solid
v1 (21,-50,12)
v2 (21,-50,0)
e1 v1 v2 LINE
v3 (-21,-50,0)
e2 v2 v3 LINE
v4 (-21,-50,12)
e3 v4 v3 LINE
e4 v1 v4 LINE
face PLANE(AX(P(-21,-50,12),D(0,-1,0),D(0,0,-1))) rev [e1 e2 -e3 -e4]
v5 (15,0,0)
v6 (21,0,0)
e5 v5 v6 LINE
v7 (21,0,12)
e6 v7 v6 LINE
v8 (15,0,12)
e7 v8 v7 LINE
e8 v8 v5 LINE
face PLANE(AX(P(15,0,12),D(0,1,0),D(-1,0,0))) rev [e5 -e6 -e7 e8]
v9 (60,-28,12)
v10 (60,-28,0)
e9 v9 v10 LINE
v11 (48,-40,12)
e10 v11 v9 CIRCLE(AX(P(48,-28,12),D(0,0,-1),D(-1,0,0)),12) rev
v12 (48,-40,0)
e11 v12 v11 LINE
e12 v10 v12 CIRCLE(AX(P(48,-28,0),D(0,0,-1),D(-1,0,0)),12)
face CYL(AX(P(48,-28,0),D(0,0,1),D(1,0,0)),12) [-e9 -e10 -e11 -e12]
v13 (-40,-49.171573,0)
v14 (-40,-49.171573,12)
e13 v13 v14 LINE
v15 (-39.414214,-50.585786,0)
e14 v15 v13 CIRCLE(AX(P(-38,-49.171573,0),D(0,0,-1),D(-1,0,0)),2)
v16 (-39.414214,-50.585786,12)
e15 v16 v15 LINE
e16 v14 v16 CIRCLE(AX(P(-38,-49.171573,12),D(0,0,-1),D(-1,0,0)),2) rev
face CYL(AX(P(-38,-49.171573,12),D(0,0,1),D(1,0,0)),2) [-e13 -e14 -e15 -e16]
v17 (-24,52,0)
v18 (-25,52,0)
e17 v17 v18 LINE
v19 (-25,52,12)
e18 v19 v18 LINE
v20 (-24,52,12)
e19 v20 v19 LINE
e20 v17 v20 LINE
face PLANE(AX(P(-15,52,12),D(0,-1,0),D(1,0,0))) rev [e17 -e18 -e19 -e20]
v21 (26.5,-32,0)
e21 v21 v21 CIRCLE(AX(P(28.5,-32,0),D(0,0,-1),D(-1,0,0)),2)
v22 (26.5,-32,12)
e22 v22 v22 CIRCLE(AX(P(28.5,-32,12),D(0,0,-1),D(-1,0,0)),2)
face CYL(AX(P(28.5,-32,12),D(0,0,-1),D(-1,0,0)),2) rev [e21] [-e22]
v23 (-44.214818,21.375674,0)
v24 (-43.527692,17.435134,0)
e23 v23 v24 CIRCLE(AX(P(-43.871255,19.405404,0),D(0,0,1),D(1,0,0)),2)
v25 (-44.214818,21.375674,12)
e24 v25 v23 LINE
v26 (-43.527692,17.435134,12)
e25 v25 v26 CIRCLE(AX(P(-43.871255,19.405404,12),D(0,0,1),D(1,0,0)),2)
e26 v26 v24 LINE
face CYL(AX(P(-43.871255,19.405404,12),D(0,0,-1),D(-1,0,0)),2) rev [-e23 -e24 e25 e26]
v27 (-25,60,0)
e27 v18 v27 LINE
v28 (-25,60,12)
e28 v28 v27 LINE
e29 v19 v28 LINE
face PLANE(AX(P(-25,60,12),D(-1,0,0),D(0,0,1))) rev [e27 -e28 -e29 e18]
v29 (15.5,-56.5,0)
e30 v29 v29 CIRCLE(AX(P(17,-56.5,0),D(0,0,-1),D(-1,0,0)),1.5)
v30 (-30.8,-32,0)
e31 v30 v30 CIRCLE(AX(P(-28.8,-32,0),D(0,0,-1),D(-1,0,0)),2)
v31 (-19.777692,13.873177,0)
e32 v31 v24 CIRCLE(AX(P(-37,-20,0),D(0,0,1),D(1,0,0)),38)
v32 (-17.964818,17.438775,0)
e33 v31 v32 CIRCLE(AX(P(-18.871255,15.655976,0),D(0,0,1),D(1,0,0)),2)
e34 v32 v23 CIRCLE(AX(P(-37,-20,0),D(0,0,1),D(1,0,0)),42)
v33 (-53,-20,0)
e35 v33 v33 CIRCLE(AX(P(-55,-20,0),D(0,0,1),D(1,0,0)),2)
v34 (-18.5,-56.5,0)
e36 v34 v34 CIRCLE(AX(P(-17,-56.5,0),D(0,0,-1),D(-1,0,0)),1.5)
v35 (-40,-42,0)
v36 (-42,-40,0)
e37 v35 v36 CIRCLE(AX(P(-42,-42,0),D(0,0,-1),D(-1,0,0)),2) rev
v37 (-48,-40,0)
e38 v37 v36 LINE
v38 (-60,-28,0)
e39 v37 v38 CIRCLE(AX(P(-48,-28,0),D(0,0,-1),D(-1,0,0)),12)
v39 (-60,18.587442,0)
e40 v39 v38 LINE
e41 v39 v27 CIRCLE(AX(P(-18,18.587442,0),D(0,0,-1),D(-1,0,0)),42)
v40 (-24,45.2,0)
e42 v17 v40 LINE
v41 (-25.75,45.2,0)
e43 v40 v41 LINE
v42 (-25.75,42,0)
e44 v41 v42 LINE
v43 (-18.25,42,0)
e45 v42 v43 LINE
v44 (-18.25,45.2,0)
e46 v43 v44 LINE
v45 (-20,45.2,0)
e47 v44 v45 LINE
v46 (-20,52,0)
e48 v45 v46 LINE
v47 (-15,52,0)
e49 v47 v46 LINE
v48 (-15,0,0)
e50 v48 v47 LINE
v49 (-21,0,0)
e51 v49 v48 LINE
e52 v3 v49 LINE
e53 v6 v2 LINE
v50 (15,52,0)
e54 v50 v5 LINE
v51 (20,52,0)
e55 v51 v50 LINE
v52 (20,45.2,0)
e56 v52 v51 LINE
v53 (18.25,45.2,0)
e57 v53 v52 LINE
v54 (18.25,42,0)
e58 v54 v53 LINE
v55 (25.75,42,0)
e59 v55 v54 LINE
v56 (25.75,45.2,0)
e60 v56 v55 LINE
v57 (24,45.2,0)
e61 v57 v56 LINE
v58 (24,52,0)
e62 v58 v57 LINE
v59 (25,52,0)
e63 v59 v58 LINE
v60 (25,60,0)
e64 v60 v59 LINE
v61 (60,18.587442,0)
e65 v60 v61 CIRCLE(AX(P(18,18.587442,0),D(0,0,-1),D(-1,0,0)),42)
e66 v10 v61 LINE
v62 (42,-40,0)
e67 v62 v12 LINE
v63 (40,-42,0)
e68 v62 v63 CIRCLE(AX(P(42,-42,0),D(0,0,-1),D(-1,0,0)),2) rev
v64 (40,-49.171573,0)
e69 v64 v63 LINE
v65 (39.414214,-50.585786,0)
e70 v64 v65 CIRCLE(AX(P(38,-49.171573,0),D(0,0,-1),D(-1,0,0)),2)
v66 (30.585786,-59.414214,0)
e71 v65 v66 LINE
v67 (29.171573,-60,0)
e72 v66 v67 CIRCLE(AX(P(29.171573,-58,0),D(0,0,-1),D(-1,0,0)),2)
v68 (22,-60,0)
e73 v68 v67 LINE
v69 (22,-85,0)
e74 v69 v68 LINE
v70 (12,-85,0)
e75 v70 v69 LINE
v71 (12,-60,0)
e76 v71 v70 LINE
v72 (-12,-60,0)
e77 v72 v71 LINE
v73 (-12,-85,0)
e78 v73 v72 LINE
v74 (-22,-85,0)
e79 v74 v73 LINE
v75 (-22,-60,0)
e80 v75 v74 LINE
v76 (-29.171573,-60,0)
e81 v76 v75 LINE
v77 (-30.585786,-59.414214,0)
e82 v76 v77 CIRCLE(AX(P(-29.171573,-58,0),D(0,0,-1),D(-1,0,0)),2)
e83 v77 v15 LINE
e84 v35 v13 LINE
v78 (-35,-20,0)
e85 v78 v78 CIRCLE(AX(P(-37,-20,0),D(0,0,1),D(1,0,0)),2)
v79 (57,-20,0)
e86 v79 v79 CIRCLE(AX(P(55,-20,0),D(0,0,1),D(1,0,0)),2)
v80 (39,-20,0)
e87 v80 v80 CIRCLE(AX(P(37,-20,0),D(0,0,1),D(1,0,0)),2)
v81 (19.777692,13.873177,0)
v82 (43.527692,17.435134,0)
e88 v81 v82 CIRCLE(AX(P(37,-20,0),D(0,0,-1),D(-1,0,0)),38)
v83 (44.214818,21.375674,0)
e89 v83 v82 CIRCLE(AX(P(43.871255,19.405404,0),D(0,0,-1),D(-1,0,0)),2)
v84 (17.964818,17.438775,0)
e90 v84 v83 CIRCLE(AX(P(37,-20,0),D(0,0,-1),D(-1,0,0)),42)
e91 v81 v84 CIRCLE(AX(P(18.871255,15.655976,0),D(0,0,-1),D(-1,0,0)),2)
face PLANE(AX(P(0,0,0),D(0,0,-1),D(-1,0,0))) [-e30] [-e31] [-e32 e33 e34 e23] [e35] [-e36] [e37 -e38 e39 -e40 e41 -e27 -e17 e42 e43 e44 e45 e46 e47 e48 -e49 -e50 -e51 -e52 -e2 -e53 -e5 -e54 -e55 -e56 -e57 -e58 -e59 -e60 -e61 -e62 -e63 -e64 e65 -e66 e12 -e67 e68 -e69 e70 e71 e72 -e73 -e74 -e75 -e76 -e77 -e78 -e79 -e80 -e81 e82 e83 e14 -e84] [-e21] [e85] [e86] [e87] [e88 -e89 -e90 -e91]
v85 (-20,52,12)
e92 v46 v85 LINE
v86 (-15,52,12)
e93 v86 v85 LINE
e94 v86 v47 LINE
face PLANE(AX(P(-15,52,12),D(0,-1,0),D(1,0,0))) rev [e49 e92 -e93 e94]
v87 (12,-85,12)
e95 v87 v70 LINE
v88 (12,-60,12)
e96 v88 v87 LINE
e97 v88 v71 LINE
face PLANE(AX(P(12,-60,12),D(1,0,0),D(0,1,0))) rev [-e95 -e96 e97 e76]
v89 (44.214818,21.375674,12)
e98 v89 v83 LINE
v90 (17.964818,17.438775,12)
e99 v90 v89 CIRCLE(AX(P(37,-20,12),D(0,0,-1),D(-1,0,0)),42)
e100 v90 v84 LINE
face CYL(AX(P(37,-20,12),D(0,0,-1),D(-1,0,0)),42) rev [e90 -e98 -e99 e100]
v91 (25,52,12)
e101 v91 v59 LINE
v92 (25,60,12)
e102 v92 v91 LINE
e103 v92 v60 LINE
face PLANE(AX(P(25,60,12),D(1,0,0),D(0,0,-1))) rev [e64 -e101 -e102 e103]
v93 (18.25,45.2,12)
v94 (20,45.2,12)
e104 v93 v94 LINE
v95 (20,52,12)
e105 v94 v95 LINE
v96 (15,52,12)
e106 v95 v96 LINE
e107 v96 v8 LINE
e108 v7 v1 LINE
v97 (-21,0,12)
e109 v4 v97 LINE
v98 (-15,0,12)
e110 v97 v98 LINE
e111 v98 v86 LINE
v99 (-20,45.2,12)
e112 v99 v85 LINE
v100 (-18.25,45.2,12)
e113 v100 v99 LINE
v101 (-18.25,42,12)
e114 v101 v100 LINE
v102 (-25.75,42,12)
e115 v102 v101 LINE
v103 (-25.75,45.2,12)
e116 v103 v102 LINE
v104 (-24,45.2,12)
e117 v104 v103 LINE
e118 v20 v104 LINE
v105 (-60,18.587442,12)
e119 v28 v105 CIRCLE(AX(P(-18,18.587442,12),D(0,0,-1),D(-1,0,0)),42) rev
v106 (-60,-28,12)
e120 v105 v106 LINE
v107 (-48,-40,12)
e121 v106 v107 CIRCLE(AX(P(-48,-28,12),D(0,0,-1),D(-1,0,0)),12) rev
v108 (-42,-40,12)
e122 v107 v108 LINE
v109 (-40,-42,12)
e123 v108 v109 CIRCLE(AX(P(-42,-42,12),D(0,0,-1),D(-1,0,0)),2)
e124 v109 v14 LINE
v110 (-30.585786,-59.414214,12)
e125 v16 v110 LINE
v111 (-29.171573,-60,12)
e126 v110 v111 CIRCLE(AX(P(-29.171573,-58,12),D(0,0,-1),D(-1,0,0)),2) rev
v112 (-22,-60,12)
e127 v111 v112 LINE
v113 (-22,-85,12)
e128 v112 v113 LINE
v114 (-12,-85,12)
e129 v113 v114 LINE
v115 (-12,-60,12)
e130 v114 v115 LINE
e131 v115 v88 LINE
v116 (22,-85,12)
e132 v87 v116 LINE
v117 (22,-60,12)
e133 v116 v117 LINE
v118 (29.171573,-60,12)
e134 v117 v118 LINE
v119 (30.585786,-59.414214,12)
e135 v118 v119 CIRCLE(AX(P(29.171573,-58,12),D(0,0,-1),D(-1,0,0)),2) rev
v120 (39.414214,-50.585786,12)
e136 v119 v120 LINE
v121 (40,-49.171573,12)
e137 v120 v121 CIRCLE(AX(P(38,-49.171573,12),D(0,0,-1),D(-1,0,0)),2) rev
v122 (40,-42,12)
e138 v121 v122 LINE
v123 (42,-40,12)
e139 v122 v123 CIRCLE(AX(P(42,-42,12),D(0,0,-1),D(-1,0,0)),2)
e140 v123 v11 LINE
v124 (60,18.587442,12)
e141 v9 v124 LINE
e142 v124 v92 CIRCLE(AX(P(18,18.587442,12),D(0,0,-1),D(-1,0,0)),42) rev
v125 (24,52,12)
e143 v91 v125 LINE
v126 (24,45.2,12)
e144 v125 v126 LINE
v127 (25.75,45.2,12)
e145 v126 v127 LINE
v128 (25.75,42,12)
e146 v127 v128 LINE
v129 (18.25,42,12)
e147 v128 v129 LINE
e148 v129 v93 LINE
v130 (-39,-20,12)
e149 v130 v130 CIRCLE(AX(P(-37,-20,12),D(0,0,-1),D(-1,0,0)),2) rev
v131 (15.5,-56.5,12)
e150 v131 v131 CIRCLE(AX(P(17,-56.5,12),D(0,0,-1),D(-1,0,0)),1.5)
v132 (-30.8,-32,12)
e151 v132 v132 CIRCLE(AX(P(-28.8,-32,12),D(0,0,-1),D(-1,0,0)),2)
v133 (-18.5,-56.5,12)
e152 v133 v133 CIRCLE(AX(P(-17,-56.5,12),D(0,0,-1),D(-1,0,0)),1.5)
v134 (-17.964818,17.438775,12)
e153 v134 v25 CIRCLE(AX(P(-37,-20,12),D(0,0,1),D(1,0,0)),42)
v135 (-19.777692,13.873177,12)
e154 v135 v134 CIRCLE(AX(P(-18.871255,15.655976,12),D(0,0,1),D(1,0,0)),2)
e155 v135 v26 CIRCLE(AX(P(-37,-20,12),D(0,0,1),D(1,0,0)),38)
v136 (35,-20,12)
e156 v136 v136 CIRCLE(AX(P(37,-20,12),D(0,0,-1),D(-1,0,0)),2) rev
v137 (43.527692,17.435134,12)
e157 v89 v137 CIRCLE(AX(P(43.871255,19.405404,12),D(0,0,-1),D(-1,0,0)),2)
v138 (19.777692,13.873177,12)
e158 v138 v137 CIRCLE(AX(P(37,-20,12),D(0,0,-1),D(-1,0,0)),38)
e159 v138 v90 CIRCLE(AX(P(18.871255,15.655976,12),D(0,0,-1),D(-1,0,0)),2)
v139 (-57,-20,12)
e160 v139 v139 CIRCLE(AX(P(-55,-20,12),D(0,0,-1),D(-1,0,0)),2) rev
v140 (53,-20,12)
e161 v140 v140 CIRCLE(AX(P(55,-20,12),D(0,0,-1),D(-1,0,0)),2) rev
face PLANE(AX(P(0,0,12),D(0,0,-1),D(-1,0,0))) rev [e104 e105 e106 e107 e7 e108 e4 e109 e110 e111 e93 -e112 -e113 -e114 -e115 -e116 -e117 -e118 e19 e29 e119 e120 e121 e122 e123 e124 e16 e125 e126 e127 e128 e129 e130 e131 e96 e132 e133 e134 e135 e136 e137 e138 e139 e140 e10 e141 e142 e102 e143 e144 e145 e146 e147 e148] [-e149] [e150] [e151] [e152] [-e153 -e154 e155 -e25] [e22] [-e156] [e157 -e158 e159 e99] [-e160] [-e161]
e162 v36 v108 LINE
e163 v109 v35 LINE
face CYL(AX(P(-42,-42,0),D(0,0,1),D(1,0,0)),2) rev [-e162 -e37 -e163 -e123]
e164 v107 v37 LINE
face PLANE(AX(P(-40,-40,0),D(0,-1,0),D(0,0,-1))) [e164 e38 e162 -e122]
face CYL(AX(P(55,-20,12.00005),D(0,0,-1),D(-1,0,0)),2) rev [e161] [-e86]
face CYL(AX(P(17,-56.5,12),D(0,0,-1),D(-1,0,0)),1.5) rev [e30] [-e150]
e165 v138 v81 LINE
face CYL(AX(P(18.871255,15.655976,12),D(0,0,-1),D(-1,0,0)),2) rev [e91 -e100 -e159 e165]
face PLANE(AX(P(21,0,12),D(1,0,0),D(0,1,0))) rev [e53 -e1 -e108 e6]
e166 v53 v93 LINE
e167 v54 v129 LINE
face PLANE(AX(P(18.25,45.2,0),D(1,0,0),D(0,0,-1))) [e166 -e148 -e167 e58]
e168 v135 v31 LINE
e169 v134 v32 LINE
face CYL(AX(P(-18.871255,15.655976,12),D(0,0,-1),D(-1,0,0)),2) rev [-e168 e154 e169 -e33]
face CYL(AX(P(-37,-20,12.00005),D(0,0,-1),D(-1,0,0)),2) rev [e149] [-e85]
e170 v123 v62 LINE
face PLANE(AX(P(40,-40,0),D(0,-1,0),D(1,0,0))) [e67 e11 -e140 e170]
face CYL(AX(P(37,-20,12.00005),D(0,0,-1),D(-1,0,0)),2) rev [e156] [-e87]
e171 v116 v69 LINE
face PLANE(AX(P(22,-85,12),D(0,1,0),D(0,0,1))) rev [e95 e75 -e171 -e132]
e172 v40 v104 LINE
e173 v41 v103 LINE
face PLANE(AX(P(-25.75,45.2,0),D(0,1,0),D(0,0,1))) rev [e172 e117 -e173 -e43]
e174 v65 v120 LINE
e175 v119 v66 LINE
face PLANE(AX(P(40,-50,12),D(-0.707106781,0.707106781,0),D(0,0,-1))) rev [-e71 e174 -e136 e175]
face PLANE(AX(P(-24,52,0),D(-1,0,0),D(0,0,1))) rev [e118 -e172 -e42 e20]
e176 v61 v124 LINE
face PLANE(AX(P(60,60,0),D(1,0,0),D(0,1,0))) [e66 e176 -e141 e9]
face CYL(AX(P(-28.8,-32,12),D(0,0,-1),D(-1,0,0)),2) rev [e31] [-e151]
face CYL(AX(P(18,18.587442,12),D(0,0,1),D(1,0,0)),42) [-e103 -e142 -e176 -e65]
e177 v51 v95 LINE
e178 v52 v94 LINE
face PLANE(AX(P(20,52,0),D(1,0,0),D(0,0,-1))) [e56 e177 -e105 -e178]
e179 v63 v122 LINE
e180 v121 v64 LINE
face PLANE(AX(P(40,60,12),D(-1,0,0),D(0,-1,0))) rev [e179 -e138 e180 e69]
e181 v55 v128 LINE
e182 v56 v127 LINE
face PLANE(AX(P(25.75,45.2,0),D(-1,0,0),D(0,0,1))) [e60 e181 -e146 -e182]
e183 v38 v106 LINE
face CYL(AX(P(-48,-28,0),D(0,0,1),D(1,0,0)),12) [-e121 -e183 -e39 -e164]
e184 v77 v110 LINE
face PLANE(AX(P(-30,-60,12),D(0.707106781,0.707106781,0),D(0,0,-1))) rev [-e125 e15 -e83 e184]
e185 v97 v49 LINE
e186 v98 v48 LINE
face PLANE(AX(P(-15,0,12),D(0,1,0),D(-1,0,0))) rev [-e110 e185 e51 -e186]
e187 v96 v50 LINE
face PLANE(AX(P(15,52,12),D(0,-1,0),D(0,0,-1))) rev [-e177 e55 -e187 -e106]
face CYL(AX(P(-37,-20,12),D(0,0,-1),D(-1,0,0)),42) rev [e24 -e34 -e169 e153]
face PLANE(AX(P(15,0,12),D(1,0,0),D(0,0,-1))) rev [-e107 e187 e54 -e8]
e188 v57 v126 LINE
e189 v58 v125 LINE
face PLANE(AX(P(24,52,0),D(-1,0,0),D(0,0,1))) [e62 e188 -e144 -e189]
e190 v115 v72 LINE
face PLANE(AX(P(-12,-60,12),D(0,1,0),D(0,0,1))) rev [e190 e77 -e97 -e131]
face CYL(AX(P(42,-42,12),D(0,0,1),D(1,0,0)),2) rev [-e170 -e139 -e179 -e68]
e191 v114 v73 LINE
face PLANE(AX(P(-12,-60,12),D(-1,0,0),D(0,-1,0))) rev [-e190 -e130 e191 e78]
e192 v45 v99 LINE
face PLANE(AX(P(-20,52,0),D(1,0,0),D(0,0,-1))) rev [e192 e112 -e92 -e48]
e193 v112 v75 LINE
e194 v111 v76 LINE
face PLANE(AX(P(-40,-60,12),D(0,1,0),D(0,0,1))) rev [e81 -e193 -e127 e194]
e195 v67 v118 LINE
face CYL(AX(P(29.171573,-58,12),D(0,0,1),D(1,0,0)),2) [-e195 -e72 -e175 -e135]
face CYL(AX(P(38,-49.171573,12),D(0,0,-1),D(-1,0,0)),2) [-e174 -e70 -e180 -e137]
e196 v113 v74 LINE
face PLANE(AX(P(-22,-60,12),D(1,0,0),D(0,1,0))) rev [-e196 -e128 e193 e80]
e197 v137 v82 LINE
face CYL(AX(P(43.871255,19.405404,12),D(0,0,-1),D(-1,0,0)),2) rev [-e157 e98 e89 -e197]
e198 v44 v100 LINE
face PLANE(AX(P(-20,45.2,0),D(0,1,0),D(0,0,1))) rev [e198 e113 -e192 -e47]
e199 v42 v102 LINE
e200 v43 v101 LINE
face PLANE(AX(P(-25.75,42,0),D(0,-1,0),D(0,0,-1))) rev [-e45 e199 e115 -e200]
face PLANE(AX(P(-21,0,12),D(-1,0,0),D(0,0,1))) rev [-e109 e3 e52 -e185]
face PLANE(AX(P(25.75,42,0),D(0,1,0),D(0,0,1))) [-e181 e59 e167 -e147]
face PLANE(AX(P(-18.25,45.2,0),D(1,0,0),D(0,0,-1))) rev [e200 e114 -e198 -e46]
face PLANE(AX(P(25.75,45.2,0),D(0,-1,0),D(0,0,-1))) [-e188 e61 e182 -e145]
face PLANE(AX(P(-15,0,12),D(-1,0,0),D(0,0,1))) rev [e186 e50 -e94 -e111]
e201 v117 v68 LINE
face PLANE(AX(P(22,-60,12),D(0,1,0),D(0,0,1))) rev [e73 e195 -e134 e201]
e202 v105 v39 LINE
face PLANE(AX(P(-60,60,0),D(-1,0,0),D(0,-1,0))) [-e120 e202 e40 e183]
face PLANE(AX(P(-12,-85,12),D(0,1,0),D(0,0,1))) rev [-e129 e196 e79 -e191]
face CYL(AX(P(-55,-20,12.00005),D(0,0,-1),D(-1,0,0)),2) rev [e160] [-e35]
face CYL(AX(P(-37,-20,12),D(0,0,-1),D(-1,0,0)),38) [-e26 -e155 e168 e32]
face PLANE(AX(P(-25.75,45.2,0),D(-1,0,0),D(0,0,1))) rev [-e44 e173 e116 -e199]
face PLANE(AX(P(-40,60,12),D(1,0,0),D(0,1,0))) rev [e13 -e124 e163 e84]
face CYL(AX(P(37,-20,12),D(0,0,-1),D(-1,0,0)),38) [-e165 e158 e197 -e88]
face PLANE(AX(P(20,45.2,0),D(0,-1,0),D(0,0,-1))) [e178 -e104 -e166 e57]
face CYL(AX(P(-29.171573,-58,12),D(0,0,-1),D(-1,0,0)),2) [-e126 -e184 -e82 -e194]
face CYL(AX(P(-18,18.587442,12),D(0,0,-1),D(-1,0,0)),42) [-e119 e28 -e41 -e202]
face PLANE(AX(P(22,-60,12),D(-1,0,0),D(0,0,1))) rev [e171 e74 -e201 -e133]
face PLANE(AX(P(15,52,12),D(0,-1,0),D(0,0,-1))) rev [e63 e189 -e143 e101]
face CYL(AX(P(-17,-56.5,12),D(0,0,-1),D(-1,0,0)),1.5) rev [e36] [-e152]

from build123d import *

# Parameters (mm, degrees)
BOSS_EXTRUDE1_DEPTH = 12
SKETCH2_R           = 2
SKETCH2_R_2         = 1.5
CUT_EXTRUDE1_DEPTH  = 95.704804524
SKETCH4_W           = 20
SKETCH4_H           = 100
BOSS_EXTRUDE2_DEPTH = 12
FILLET3_R           = 42
FILLET4_R           = 12
SKETCH7_R           = 2
CUT_EXTRUDE3_DEPTH  = 105.732993846
CHAMFER1_SIZE       = 10
FILLET8_R           = 2
CUT_EXTRUDE4_DEPTH  = 105.732993846
CUT_EXTRUDE5_DEPTH  = 105.732993846


with BuildPart() as part:
    # Sketch1 → Boss-Extrude1 (new body)
    with BuildSketch(Plane.XY):
        Polygon((-40, 60), (-25, 60), (-25, 52), (-15, 52), (-15, 0), (-21, 0), (-21, -50), (21, -50), (21, 0), (15, 0), (15, 52), (25, 52), (25, 60), (40, 60), (40, -60), (22, -60), (22, -85), (12, -85), (12, -60), (-12, -60), (-12, -85), (-22, -85), (-22, -60), (-40, -60), align=None)
    extrude(amount=BOSS_EXTRUDE1_DEPTH)

    # Sketch2 → Cut-Extrude1 (cut, through all)
    with BuildSketch(Plane(origin=(0, 0, 0), x_dir=(-1, 0, 0), z_dir=(0, 0, -1))):
        with Locations((-28.5, -32)):
            Circle(SKETCH2_R)
        with Locations((17, -56.5)):
            Circle(SKETCH2_R_2)
        with Locations((28.8, -32)):
            Circle(SKETCH2_R)
        with Locations((-17, -56.5)):
            Circle(SKETCH2_R_2)
    extrude(amount=-CUT_EXTRUDE1_DEPTH, mode=Mode.SUBTRACT)

    # Sketch4 → Boss-Extrude2 (add)
    with BuildSketch(Plane.XY.offset(12)):
        with Locations((-50, 10)):
            Rectangle(SKETCH4_W, SKETCH4_H)
        with Locations((50, 10)):
            Rectangle(SKETCH4_W, SKETCH4_H)
    extrude(amount=-BOSS_EXTRUDE2_DEPTH)

    # Fillet3
    # the kernel refuses this fillet: 42 mm, written as the material it takes off along each edge
    with BuildSketch(Plane(origin=(60, 60, 115.531396204), x_dir=(0, -1, 0), z_dir=(0, 0, -1))) as fillet3_piece_1:
        with BuildLine():
            CenterArc((41.412558482, 42), FILLET3_R, 189.594068227, 80.405931773)
            Line((0, 35), (-0.82825117, 34.86))
            ThreePointArc((-0.82825117, 34.86), (-0.84, 17.5), (-0.84, 0))
            Line((-0.84, 0), (0, -0.84))
            Line((0, -0.84), (41.412558482, -0.84))
            Line((41.412558482, -0.84), (41.412558482, 0))
        make_face()
    extrude(amount=219.062792409, mode=Mode.SUBTRACT)
    with BuildSketch(Plane(origin=(-60, 60, 115.531396204), x_dir=(1, 0, 0), z_dir=(0, 0, -1))) as fillet3_piece_2:
        with BuildLine():
            CenterArc((42, 41.412558482), FILLET3_R, 180, 80.405931773)
            Line((0, 41.412558482), (-0.84, 41.412558482))
            Line((-0.84, 41.412558482), (-0.84, 0))
            Line((-0.84, 0), (0, -0.84))
            ThreePointArc((0, -0.84), (17.5, -0.84), (34.86, -0.82825117))
            Line((34.86, -0.82825117), (35, 0))
        make_face()
    extrude(amount=219.062792409, mode=Mode.SUBTRACT)

    # Fillet4
    fillet4_edges = [part.edges().sort_by_distance(p)[0] for p in [
        (60, -40, 6),
        (-60, -40, 6),
    ]]
    fillet(fillet4_edges, radius=FILLET4_R)

    # Sketch7 → Cut-Extrude3 (cut, through all)
    with BuildSketch(Plane.XY):
        with Locations(Location((-55, -20, 0), (0, 0, 180))):
            Circle(SKETCH7_R)
        with Locations(Location((55, -20, 0), (0, 0, 180))):
            Circle(SKETCH7_R)
        with Locations(Location((-37, -20, 0), (0, 0, 180))):
            Circle(SKETCH7_R)
        with Locations(Location((37, -20, 0), (0, 0, 180))):
            Circle(SKETCH7_R)
    extrude(amount=CUT_EXTRUDE3_DEPTH, mode=Mode.SUBTRACT)

    # Chamfer1
    chamfer1_edges = [part.edges().sort_by_distance(p)[0] for p in [
        (-40, -60, 6),
        (40, -60, 6),
    ]]
    chamfer(chamfer1_edges, length=CHAMFER1_SIZE)

    # Fillet8
    fillet8_edges = [part.edges().sort_by_distance(p)[0] for p in [
        (-30, -60, 6),
        (-40, -50, 6),
        (30, -60, 6),
        (40, -50, 6),
        (40, -40, 6),
        (-40, -40, 6),
    ]]
    fillet(fillet8_edges, radius=FILLET8_R)

    # Sketch8 → Cut-Extrude4 (cut, through all)
    with BuildSketch(Plane(origin=(0, 0, 0), x_dir=(-1, 0, 0), z_dir=(0, 0, -1))):
        with BuildLine():
            ThreePointArc((-17.964817996, 17.438774634), (-30.770630407, 21.535466224), (-44.214817996, 21.375674028))
            ThreePointArc((-44.214817996, 21.375674028), (-45.841525426, 19.061841075), (-43.527692473, 17.435133644))
            ThreePointArc((-43.527692473, 17.435133644), (-31.363903701, 17.579707536), (-19.777692473, 13.87317705))
            ThreePointArc((-19.777692473, 13.87317705), (-17.088456442, 14.749538603), (-17.964817996, 17.438774634))
        make_face()
        with BuildLine():
            ThreePointArc((17.964817996, 17.438774634), (30.770630407, 21.535466224), (44.214817996, 21.375674028))
            ThreePointArc((44.214817996, 21.375674028), (45.841525426, 19.061841075), (43.527692473, 17.435133644))
            ThreePointArc((43.527692473, 17.435133644), (31.363903701, 17.579707536), (19.777692473, 13.87317705))
            ThreePointArc((19.777692473, 13.87317705), (17.088456442, 14.749538603), (17.964817996, 17.438774634))
        make_face()
    extrude(amount=-CUT_EXTRUDE4_DEPTH, mode=Mode.SUBTRACT)

    # Sketch9 → Cut-Extrude5 (cut, through all)
    with BuildSketch(Plane.XY.offset(12)):
        Polygon((-24, 52), (-20, 52), (-20, 45.2), (-18.25, 45.2), (-18.25, 42), (-25.75, 42), (-25.75, 45.2), (-24, 45.2), align=None)
    cut_extrude5 = extrude(amount=-CUT_EXTRUDE5_DEPTH, mode=Mode.SUBTRACT)

    # Mirror1: Cut-Extrude5 across plane
    add(cut_extrude5.mirror(Plane(origin=(0, 0, 0), x_dir=(0, 0, 1), z_dir=(1, 0, 0))), mode=Mode.SUBTRACT)


solid = part.part
